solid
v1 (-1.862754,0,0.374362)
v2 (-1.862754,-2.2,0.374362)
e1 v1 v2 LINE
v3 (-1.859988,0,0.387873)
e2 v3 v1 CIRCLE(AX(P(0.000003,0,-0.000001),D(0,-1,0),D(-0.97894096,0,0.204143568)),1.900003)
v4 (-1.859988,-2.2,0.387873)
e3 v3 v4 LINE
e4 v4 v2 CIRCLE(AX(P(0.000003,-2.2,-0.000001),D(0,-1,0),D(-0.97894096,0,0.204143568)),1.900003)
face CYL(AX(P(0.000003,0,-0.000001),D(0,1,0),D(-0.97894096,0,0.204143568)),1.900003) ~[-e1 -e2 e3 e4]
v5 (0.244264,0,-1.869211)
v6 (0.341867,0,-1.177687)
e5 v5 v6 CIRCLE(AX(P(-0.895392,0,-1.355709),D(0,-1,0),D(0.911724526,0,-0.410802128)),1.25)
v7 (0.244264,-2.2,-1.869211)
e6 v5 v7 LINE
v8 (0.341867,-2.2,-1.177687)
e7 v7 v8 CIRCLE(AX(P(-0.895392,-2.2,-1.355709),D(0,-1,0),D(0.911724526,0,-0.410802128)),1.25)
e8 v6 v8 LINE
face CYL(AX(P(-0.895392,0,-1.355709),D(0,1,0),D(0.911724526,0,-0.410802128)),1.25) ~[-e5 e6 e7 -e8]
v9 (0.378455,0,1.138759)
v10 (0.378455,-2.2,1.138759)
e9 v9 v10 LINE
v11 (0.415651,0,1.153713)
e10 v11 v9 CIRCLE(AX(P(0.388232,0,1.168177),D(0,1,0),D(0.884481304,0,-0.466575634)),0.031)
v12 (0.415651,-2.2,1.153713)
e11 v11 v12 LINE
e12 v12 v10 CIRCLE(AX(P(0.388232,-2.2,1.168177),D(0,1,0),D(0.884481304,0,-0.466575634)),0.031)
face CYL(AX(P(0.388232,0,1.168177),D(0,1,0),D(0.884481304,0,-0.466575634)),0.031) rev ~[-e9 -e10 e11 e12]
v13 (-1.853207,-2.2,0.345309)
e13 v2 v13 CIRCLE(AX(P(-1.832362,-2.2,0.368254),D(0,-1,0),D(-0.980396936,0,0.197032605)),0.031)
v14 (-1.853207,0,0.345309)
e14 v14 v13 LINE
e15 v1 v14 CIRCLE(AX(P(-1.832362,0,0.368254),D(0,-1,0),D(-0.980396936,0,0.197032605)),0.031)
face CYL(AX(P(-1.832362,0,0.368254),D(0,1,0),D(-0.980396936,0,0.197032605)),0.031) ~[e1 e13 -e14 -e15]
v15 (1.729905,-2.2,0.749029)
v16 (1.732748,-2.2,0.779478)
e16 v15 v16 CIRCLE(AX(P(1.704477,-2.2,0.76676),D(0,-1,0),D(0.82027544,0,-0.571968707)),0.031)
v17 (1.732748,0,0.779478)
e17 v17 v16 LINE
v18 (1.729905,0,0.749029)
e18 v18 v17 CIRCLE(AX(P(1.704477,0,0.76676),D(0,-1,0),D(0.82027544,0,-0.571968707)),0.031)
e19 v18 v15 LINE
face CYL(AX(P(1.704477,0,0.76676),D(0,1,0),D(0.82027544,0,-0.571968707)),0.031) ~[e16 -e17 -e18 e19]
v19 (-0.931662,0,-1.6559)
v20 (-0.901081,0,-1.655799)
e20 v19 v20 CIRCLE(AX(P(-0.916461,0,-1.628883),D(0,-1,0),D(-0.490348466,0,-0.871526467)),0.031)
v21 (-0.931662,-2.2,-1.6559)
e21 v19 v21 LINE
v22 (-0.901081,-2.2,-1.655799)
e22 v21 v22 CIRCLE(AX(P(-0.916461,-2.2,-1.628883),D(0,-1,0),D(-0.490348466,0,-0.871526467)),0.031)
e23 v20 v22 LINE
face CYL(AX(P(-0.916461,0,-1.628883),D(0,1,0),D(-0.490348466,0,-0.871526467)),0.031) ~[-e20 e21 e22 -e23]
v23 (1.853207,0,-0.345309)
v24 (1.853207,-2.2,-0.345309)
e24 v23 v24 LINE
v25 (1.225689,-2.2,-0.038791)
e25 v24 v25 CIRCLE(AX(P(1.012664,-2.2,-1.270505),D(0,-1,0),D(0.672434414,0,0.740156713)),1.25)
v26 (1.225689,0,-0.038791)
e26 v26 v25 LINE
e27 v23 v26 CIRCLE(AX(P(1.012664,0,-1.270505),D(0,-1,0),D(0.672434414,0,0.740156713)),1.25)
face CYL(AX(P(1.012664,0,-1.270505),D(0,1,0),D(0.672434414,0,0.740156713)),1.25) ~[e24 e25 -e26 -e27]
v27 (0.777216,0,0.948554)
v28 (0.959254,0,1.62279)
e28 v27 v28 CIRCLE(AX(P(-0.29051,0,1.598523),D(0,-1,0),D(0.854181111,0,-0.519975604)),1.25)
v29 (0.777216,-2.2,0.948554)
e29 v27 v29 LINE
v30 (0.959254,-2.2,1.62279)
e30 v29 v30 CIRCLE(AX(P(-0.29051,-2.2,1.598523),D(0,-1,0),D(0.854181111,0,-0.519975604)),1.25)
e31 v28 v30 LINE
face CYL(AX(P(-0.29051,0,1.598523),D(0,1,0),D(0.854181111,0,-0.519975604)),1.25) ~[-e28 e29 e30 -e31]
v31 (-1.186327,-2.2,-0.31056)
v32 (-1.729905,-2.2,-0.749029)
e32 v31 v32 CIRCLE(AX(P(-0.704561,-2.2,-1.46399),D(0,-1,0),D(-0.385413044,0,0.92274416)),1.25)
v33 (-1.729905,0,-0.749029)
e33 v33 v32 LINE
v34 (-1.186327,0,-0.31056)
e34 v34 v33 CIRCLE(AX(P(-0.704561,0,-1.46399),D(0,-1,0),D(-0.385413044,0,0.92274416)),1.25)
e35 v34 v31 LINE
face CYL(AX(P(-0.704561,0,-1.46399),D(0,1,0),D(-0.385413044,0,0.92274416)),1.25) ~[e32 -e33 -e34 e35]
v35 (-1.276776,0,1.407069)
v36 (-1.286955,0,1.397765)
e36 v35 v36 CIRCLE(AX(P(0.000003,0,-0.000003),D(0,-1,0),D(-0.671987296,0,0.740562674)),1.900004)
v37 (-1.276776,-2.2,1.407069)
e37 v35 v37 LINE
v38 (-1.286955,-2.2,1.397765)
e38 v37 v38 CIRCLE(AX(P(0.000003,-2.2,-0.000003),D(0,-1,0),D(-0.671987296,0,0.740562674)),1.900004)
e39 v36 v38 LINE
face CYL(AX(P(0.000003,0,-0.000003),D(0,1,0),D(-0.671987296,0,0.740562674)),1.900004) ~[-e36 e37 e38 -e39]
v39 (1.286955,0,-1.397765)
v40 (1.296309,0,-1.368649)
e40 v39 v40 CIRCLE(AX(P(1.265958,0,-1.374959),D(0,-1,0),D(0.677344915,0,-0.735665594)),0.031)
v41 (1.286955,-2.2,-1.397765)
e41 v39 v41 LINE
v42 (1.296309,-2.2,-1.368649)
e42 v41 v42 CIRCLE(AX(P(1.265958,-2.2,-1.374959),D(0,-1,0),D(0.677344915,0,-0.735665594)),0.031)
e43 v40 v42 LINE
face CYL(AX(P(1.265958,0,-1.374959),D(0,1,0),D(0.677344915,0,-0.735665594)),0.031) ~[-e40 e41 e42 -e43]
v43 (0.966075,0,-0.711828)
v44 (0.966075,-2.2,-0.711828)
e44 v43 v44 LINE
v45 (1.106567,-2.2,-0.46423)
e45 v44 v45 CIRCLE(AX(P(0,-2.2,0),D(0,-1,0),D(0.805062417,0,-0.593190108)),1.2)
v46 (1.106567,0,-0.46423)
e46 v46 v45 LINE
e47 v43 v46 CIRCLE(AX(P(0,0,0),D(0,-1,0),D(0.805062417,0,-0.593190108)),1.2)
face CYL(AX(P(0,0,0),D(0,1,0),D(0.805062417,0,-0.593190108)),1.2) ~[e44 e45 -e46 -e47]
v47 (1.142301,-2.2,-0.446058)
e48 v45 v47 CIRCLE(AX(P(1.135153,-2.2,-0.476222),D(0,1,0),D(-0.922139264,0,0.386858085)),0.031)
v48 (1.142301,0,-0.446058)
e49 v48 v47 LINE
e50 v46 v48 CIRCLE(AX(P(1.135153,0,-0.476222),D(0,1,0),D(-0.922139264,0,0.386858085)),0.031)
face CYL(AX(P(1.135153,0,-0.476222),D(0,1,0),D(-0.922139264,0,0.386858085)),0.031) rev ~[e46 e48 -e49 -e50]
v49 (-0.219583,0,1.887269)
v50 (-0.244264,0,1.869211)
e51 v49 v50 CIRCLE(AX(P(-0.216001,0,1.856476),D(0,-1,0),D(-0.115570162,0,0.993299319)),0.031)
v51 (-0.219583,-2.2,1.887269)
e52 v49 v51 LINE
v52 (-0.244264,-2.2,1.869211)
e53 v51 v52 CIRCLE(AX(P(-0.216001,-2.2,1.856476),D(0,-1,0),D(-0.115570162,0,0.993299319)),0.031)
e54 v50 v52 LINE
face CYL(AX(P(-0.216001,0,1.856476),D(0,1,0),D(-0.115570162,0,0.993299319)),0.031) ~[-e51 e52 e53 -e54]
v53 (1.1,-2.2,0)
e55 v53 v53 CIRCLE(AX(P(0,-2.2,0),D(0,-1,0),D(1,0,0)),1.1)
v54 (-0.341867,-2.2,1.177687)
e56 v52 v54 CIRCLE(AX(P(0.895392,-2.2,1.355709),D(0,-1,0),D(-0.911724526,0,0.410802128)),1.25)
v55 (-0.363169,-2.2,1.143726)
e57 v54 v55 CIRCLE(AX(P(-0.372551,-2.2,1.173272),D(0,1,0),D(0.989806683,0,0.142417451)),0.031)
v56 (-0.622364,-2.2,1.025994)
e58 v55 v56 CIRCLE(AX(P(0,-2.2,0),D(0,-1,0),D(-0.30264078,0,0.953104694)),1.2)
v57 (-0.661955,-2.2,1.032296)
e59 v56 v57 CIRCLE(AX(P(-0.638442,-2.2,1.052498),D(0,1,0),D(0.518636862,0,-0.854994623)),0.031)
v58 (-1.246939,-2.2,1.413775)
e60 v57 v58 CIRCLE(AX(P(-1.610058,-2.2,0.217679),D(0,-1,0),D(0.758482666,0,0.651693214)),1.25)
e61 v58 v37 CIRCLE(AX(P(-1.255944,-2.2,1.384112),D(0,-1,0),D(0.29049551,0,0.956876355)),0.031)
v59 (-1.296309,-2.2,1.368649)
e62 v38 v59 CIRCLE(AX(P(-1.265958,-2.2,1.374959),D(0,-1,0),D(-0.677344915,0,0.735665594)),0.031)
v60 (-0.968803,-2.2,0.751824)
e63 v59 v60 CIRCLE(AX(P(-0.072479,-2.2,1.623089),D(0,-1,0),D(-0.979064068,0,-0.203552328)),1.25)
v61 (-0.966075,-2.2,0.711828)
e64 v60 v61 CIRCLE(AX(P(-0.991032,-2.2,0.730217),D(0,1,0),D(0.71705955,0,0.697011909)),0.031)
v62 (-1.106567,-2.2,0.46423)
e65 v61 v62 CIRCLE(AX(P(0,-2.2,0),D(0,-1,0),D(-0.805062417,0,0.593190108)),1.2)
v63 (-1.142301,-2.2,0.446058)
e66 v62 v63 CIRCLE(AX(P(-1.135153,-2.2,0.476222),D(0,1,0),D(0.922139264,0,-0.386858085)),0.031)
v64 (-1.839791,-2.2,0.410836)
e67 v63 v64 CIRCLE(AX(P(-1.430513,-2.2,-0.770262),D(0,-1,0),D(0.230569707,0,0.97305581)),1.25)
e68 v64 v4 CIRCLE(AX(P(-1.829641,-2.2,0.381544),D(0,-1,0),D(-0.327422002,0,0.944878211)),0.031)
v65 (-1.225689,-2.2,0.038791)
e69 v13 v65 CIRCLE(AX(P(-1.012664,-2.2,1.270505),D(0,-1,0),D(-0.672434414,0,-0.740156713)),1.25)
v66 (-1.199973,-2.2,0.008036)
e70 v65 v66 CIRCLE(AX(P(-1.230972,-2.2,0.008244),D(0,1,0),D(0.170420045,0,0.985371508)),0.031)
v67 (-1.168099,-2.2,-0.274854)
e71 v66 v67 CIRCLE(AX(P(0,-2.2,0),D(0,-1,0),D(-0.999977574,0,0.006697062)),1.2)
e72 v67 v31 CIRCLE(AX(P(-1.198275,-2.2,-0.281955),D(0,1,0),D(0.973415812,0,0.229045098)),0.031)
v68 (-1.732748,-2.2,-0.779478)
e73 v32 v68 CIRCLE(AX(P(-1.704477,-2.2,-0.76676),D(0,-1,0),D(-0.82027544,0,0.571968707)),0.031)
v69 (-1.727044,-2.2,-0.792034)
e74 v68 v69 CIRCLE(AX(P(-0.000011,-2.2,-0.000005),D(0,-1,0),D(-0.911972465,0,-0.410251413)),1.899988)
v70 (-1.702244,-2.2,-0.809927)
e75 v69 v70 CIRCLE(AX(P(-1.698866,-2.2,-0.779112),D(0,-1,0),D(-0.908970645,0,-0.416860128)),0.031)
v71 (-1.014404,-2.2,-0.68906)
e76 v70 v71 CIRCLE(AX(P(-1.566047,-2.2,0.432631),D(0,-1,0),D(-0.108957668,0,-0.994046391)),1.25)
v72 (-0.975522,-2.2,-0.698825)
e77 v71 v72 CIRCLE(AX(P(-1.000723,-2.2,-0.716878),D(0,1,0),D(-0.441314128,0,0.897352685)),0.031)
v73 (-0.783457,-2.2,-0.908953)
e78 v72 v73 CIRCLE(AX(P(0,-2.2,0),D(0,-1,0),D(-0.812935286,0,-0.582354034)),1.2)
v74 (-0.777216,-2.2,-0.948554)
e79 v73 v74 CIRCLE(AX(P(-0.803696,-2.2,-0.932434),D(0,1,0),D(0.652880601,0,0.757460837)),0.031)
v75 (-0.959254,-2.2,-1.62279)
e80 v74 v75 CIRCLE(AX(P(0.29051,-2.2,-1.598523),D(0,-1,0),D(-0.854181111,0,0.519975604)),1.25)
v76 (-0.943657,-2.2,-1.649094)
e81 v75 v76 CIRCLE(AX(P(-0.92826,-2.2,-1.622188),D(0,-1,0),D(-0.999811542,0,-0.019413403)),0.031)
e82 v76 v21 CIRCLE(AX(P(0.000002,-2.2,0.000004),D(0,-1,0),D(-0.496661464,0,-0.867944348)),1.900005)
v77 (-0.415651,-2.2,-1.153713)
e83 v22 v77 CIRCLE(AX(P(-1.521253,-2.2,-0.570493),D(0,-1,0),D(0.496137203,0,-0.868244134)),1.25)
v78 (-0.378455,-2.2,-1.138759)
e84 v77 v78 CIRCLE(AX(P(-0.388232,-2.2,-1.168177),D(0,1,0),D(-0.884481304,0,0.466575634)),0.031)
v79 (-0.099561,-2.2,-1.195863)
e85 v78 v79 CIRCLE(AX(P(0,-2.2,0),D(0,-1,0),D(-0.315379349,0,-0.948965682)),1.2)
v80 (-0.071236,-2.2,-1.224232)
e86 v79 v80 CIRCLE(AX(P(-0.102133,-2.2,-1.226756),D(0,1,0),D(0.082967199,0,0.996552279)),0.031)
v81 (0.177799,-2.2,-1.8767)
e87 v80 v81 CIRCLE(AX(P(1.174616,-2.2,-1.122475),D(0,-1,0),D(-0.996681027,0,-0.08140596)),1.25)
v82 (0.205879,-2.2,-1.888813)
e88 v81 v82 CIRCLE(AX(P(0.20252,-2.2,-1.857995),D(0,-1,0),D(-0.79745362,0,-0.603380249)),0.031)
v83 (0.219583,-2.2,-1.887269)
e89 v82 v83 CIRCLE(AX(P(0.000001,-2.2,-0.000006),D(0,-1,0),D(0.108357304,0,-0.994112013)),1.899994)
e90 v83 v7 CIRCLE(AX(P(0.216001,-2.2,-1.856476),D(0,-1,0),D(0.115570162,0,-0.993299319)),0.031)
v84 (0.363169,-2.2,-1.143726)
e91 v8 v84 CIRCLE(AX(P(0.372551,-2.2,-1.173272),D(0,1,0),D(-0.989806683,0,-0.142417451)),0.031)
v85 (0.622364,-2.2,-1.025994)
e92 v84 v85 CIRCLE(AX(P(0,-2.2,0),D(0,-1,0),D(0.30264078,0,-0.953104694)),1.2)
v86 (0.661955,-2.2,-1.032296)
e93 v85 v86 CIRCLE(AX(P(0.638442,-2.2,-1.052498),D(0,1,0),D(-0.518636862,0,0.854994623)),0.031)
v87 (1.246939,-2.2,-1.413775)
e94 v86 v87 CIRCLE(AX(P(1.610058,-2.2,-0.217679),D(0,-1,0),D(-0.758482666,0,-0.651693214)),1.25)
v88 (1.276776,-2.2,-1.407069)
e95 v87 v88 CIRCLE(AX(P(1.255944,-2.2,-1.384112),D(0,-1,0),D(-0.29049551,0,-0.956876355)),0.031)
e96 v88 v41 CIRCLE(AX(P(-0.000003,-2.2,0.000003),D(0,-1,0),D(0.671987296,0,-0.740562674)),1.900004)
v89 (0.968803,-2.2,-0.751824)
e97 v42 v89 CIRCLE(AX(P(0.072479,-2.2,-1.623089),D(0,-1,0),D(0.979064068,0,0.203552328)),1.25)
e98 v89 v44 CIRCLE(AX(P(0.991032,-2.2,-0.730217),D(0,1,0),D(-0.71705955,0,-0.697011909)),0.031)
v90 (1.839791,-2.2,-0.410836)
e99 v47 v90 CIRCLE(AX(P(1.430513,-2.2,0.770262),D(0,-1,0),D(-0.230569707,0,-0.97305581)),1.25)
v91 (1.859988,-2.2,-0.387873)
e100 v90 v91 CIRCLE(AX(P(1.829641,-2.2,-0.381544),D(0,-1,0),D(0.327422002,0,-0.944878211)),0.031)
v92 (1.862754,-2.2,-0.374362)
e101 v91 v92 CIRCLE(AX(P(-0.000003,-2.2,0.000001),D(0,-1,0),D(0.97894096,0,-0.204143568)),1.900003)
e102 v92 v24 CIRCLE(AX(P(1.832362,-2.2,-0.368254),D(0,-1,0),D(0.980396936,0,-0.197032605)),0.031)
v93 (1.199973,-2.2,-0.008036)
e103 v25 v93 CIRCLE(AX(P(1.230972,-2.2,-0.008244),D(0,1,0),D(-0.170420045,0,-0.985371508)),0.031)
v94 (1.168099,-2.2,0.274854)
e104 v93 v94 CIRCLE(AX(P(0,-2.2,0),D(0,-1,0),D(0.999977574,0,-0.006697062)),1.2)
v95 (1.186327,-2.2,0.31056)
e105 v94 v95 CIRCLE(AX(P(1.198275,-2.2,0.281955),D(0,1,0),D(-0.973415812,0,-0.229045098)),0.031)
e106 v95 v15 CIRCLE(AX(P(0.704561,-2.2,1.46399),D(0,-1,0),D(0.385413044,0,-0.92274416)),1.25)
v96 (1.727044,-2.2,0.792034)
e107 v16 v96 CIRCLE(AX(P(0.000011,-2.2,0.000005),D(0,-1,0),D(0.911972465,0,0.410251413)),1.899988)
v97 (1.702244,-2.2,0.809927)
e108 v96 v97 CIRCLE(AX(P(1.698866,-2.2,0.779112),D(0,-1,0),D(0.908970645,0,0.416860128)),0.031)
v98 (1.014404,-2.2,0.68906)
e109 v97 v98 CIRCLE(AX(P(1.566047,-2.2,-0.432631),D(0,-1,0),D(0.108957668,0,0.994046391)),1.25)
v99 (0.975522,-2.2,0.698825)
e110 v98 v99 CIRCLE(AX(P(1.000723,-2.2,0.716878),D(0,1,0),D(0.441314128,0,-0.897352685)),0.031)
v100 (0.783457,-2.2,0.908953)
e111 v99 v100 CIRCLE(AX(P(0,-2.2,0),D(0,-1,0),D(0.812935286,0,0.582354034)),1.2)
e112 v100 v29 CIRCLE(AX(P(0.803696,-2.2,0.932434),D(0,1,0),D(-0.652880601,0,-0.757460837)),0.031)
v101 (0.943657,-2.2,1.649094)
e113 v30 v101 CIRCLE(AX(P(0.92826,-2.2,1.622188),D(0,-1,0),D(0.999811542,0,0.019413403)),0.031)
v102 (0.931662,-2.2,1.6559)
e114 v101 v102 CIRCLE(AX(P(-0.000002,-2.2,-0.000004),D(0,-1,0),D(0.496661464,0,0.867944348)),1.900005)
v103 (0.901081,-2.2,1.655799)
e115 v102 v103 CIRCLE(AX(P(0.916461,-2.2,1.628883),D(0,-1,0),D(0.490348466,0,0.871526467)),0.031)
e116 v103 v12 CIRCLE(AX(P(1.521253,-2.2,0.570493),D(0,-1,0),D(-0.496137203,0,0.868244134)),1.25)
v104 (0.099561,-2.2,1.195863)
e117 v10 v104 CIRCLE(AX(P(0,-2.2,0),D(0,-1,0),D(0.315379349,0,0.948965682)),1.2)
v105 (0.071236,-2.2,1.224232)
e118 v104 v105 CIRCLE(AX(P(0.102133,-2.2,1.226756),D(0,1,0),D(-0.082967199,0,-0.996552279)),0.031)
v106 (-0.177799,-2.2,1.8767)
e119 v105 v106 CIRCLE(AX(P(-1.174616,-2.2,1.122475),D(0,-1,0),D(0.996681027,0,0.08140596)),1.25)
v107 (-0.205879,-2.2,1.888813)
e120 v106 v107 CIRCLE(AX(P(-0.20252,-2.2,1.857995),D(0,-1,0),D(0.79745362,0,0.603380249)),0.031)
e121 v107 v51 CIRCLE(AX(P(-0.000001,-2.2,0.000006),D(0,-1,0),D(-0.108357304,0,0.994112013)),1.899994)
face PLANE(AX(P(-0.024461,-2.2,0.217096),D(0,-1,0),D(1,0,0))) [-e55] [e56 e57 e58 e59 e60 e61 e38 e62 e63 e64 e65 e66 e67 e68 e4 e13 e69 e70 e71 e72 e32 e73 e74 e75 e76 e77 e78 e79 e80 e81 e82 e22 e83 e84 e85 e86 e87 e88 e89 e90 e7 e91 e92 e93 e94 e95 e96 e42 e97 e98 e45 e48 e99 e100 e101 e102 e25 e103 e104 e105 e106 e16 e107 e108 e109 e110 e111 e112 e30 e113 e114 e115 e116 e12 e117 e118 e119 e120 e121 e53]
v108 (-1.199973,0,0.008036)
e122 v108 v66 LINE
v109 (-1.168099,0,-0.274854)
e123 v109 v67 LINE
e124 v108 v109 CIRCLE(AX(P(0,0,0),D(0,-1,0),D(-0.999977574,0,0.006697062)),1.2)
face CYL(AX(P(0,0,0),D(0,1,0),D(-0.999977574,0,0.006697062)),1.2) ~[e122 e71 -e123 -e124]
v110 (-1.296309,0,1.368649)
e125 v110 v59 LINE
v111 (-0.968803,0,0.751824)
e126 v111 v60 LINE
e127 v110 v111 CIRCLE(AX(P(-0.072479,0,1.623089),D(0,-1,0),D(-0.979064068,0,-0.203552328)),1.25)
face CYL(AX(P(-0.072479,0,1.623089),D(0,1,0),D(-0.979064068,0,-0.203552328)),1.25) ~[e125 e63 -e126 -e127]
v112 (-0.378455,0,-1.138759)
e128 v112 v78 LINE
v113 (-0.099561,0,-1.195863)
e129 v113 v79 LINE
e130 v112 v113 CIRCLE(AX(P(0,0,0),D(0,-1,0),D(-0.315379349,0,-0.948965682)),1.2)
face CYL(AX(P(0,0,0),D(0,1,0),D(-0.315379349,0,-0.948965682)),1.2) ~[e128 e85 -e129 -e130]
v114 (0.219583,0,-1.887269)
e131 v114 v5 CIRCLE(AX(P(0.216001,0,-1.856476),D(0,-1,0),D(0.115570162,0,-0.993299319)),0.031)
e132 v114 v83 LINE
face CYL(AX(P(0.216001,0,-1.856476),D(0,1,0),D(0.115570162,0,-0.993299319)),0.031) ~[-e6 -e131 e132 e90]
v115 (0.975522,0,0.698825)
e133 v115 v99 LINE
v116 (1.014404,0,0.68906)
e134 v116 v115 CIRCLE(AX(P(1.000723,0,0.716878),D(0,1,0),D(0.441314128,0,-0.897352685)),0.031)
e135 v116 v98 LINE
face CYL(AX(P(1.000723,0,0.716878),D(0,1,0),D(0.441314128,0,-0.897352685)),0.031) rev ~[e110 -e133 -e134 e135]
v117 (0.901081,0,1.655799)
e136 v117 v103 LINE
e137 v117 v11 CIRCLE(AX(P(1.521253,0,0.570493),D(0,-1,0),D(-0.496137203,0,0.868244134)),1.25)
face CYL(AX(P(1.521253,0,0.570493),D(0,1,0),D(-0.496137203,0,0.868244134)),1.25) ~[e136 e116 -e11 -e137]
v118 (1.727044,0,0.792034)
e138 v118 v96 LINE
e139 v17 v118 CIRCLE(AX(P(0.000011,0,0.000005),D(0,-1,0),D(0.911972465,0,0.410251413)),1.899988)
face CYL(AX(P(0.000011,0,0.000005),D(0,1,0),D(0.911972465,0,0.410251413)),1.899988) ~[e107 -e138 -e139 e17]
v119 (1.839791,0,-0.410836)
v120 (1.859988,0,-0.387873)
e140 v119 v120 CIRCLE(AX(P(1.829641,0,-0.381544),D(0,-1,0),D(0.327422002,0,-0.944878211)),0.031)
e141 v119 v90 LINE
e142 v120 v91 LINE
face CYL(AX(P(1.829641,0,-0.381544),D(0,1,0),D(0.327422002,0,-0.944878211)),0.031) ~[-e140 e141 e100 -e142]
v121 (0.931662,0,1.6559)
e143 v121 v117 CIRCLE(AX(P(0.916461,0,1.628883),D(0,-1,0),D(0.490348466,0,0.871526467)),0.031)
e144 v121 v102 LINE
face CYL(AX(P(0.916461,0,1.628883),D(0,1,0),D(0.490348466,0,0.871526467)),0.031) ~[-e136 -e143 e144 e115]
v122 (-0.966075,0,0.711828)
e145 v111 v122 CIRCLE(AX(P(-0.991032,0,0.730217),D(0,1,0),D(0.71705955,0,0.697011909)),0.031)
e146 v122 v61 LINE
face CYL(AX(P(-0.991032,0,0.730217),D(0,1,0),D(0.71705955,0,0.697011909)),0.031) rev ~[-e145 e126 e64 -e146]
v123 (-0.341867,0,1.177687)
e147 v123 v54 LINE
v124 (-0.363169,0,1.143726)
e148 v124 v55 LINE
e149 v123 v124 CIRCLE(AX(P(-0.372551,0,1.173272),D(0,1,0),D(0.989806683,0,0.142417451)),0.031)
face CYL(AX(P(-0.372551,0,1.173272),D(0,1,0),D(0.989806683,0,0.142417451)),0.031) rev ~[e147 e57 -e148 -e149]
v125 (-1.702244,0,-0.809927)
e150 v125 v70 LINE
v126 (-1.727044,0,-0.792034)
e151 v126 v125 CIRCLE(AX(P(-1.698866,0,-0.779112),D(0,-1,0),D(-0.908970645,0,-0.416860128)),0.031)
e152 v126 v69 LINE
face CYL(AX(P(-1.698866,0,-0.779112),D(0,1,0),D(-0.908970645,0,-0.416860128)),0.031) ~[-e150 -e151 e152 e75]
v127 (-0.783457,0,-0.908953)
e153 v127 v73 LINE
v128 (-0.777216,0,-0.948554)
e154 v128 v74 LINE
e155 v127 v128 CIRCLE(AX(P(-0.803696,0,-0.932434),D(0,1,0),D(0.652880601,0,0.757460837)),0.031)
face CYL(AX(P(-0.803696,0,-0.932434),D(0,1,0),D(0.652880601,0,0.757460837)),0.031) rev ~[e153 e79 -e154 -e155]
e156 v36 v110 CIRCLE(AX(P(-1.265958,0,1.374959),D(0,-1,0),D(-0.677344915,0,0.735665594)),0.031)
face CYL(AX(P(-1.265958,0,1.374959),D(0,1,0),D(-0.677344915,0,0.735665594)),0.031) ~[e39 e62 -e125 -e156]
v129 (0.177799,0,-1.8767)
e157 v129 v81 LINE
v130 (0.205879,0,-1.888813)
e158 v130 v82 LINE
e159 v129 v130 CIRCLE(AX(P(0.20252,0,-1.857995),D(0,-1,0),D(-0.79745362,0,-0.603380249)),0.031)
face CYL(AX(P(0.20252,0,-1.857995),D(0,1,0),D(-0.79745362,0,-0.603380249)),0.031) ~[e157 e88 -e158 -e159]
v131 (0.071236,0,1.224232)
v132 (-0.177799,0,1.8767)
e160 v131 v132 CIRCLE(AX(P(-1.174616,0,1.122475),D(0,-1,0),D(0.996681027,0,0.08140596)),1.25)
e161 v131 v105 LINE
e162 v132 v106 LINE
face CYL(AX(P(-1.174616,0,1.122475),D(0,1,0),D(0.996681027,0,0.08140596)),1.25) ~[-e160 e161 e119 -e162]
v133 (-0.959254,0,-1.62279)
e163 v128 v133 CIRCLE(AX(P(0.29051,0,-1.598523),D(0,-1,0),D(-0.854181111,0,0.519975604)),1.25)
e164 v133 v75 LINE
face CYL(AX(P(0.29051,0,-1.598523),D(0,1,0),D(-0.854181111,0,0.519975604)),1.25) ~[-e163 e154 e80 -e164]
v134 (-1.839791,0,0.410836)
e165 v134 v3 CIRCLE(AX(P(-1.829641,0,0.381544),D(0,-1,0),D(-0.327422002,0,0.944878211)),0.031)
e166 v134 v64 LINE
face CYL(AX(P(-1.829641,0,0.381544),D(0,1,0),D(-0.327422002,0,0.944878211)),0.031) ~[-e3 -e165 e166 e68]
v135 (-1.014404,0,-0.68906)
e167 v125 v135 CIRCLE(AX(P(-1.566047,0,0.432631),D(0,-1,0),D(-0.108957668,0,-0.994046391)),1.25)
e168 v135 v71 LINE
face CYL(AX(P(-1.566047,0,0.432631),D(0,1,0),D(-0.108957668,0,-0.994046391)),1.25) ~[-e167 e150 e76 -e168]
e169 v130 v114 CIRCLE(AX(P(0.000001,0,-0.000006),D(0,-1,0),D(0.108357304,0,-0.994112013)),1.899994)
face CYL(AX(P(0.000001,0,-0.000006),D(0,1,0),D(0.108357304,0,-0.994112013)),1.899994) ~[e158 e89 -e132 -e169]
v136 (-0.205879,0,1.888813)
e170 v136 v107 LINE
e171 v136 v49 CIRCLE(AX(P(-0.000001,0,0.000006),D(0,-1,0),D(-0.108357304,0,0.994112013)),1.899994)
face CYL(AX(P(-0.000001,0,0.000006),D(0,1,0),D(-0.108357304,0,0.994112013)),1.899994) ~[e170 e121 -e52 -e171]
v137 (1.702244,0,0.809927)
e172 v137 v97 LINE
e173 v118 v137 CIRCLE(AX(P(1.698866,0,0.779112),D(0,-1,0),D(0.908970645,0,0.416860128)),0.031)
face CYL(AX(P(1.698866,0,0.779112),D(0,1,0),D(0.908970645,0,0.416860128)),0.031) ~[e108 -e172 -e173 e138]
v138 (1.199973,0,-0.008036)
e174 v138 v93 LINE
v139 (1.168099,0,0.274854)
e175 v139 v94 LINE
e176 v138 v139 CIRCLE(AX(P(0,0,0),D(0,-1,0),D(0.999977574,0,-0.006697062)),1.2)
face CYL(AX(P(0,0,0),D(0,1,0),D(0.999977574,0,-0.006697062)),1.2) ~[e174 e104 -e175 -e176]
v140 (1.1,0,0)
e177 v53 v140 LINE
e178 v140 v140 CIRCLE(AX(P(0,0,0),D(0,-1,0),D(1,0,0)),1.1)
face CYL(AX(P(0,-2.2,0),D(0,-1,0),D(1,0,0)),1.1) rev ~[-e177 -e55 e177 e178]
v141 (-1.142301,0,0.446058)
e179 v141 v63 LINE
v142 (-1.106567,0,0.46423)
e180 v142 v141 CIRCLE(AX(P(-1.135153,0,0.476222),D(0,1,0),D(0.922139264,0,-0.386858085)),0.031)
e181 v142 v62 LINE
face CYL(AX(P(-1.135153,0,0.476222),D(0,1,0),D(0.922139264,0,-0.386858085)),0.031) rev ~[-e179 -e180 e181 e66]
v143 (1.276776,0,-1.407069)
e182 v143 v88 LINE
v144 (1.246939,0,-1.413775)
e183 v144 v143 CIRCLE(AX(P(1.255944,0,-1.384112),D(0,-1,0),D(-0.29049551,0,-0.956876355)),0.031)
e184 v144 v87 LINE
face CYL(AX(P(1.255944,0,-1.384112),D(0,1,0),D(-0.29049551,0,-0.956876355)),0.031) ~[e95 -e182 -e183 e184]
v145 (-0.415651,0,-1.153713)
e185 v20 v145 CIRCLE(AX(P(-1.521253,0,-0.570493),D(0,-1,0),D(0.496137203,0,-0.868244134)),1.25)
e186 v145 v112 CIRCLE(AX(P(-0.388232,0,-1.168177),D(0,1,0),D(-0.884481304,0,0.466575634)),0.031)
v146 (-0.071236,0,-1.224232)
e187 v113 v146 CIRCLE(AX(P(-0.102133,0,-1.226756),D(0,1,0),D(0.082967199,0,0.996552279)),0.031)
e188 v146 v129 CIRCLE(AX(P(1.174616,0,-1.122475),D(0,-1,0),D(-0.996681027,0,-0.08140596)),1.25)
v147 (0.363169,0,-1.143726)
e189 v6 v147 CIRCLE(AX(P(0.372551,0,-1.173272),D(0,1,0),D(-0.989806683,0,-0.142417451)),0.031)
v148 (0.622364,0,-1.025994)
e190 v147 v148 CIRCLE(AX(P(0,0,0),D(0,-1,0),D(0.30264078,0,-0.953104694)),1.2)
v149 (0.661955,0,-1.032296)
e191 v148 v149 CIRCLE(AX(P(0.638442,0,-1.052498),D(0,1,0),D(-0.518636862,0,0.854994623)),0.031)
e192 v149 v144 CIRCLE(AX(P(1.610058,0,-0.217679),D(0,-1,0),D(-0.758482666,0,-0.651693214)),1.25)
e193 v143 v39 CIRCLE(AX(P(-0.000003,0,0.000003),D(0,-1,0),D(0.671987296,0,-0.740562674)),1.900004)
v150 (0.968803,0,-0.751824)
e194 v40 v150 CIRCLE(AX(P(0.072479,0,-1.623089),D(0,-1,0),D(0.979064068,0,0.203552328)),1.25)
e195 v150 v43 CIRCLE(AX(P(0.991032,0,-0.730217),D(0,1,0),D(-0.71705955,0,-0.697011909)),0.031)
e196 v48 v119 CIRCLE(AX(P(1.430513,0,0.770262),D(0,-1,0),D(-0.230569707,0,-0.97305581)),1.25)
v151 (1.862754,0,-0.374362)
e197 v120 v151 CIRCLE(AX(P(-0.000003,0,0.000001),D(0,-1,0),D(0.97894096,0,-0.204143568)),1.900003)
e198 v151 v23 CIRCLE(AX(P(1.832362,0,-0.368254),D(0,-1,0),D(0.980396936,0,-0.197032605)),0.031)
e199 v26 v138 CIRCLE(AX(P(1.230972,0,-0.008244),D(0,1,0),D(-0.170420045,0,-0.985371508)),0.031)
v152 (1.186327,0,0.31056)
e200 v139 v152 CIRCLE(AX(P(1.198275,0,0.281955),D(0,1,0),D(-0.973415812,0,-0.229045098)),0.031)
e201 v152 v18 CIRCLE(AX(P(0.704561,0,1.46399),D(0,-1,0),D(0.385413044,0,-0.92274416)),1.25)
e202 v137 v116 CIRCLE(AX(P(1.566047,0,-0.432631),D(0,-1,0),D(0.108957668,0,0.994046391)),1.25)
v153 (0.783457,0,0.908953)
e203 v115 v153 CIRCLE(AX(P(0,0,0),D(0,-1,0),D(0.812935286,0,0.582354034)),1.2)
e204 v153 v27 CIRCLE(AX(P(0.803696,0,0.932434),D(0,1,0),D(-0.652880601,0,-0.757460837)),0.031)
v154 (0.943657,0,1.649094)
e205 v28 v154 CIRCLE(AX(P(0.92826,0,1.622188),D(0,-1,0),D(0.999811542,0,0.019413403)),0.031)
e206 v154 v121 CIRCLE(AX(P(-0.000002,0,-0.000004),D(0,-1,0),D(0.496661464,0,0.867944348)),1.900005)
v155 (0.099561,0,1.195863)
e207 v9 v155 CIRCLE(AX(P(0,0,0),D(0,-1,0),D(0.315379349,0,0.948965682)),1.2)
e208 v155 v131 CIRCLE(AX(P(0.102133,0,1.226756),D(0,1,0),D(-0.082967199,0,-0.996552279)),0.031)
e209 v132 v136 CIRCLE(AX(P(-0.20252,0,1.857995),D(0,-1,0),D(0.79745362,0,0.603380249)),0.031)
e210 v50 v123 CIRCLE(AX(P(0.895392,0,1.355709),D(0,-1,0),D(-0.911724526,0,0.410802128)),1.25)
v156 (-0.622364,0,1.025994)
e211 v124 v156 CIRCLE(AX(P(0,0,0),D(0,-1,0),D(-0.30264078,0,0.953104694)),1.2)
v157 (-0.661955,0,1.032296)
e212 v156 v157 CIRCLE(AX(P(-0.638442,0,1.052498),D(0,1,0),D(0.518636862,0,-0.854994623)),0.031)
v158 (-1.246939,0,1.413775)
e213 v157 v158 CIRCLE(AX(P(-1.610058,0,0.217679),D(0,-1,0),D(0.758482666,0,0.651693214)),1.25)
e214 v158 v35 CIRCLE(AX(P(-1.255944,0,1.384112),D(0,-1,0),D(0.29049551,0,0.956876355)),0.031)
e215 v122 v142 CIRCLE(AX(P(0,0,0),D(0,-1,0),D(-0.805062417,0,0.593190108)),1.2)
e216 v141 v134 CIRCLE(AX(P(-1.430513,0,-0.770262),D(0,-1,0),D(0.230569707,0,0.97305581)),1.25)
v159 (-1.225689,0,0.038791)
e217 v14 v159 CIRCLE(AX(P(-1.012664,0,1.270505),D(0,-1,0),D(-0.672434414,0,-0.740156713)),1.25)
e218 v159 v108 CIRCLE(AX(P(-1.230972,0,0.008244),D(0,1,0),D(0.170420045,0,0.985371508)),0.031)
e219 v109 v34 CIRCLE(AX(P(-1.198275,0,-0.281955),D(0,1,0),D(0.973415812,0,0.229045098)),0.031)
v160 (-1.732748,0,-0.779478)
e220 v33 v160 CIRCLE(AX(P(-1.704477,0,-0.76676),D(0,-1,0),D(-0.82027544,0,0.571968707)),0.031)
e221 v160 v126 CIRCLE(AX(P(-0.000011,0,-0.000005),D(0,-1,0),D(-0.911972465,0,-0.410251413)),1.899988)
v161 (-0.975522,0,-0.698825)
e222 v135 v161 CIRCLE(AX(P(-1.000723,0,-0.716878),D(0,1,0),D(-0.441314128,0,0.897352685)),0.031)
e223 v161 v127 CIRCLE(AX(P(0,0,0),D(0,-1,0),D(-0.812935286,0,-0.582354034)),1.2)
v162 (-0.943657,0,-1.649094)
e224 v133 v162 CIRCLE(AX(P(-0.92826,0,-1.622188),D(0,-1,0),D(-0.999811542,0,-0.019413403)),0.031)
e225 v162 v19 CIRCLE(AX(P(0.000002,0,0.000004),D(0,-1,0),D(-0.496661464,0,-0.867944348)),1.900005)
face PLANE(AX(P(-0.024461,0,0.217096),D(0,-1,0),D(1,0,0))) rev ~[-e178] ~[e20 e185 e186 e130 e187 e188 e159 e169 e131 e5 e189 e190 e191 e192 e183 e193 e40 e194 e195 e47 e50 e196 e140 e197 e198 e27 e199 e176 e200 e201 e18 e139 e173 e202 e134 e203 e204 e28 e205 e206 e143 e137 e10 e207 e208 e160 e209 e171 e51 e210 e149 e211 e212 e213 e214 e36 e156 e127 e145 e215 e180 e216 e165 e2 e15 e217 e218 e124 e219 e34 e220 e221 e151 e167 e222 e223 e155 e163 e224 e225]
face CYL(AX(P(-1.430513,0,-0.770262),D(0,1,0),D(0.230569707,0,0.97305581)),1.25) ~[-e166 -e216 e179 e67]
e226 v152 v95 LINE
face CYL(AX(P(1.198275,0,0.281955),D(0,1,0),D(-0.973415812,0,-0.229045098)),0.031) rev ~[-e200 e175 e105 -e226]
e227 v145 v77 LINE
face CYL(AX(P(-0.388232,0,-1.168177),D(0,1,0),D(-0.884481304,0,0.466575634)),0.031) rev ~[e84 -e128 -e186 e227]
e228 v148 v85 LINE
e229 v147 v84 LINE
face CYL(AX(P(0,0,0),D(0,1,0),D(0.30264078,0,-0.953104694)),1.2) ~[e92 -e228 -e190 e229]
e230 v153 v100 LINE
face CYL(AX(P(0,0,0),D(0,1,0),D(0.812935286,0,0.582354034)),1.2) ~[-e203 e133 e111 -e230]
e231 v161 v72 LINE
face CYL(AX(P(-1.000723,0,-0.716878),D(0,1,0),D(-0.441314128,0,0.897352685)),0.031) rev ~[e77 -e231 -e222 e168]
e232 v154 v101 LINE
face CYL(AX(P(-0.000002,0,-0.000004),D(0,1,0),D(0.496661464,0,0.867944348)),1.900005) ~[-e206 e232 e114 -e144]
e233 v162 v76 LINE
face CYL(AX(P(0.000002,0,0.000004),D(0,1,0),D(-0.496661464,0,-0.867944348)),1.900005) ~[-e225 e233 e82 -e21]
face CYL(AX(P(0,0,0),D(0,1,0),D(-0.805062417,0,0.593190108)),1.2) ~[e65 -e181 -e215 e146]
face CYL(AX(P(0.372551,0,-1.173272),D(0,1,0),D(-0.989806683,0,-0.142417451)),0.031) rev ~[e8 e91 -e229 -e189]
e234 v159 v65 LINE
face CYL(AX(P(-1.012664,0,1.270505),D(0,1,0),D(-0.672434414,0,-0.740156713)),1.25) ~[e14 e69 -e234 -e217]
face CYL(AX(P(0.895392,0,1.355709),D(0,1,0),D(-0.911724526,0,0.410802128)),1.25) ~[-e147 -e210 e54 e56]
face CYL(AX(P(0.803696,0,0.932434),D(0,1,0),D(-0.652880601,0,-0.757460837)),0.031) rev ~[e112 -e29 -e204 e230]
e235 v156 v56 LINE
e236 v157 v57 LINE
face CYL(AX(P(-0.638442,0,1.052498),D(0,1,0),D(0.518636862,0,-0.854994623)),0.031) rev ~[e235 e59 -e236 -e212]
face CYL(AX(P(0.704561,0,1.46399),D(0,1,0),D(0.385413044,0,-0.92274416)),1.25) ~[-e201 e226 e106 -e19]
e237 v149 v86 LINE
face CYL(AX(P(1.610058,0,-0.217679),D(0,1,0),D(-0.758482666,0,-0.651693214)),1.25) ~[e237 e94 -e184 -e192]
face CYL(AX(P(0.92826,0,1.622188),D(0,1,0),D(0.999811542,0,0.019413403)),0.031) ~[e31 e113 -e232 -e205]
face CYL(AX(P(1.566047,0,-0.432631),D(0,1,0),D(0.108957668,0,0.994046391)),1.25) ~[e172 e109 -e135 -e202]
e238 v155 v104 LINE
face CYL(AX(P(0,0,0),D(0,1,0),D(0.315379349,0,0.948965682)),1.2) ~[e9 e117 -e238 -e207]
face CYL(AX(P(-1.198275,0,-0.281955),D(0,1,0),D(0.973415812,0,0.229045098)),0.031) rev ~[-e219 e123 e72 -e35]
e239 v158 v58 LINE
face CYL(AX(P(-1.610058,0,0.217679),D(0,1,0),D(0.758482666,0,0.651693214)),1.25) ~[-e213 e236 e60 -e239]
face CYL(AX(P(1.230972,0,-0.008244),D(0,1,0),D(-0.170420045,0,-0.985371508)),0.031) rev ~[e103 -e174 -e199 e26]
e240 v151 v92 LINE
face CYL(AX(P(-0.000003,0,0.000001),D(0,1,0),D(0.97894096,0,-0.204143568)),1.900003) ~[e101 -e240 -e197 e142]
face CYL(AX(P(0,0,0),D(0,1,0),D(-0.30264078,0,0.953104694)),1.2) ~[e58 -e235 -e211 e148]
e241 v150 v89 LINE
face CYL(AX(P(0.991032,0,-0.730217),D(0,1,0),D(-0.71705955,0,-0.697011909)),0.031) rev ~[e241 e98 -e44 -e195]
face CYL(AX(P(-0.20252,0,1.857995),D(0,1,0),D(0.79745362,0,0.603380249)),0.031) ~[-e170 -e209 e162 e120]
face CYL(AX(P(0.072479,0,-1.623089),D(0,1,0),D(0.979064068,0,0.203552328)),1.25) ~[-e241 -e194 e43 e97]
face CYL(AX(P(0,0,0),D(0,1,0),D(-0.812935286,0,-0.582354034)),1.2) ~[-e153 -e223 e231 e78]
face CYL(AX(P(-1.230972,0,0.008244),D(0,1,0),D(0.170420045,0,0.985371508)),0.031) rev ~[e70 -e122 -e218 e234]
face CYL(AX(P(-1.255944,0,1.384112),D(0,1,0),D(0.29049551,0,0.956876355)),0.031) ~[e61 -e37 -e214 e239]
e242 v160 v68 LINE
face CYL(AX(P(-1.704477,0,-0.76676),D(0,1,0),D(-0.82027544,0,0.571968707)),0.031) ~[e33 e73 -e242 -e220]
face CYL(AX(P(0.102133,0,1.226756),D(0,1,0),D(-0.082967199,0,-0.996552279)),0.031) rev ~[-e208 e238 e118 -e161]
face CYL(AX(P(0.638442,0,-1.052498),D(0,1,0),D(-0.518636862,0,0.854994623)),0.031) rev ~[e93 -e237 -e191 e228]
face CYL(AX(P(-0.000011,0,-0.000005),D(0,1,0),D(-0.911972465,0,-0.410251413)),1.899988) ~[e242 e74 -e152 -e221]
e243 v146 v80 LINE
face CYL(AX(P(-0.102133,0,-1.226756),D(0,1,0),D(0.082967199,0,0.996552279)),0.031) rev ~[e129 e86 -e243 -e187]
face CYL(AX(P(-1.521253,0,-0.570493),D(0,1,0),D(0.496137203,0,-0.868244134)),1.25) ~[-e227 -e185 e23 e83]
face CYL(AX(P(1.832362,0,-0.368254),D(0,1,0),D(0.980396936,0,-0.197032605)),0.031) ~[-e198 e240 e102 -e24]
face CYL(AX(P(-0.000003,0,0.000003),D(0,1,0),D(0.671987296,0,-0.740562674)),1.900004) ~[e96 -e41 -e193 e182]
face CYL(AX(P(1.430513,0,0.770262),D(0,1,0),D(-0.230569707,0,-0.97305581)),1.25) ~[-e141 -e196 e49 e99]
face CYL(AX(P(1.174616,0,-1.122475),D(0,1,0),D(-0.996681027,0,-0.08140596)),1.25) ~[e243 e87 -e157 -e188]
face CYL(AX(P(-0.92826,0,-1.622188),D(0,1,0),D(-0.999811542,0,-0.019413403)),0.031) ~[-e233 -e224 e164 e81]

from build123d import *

# Parameters (mm, degrees)
F1_DEPTH = 2.2
F2_R     = 1.1
F3_DEPTH = 2.201


# Not quite as in the source:
# - a feature names something its author has since deleted; it is built from what else it names


with BuildPart() as f1:
    # F0 (on Front) → F1 (new body)
    with BuildSketch(Plane.XZ):
        with BuildLine():
            ThreePointArc((0.0712355079, 1.2242322703), (-0.0067892224, 1.5682114478), (-0.1777987566, 1.8767001385))
            ThreePointArc((-0.1777987566, 1.8767001385), (-0.1902412648, 1.886460015), (-0.2058788954, 1.888812823))
            ThreePointArc((-0.2058788954, 1.888812823), (-0.2127325046, 1.8880531988), (-0.2195833118, 1.8872687061))
            ThreePointArc((-0.2195833118, 1.8872687061), (-0.2343053253, 1.8814951877), (-0.244264097, 1.8692112932))
            ThreePointArc((-0.244264097, 1.8692112932), (-0.3423408736, 1.5304038568), (-0.3418667931, 1.1776868196))
            ThreePointArc((-0.3418667931, 1.1776868196), (-0.3462894397, 1.1567994489), (-0.3631689361, 1.1437256331))
            ThreePointArc((-0.3631689361, 1.1437256331), (-0.496270206, 1.092573056), (-0.6223642321, 1.025993549))
            ThreePointArc((-0.6223642321, 1.025993549), (-0.8096046551, 0.885742797), (-0.966074901, 0.7118281293))
            ThreePointArc((-0.966074901, 0.7118281293), (-1.0436893598, 0.5922098617), (-1.1065671175, 0.4642297001))
            ThreePointArc((-1.1065671175, 0.4642297001), (-1.1756104781, 0.2407072989), (-1.1999730893, 0.0080364743))
            ThreePointArc((-1.1999730893, 0.0080364743), (-1.1924546519, -0.1343573713), (-1.1680989749, -0.2748541157))
            ThreePointArc((-1.1680989749, -0.2748541157), (-1.092573056, -0.496270206), (-0.9755223431, -0.6988248408))
            ThreePointArc((-0.9755223431, -0.6988248408), (-0.885742797, -0.8096046551), (-0.7834567261, -0.9089530012))
            ThreePointArc((-0.7834567261, -0.9089530012), (-0.5922098617, -1.0436893598), (-0.3784552187, -1.1387588188))
            ThreePointArc((-0.3784552187, -1.1387588188), (-0.2407072989, -1.1756104781), (-0.0995606366, -1.1958627344))
            ThreePointArc((-0.0995606366, -1.1958627344), (0.1343573713, -1.1924546519), (0.3631689361, -1.1437256331))
            ThreePointArc((0.3631689361, -1.1437256331), (0.496270206, -1.092573056), (0.6223642321, -1.025993549))
            ThreePointArc((0.6223642321, -1.025993549), (0.8096046551, -0.885742797), (0.966074901, -0.7118281293))
            ThreePointArc((0.966074901, -0.7118281293), (1.0436893598, -0.5922098617), (1.1065671175, -0.4642297001))
            ThreePointArc((1.1065671175, -0.4642297001), (1.1756104781, -0.2407072989), (1.1999730893, -0.0080364743))
            ThreePointArc((1.1999730893, -0.0080364743), (1.1924546519, 0.1343573713), (1.1680989749, 0.2748541157))
            ThreePointArc((1.1680989749, 0.2748541157), (1.092573056, 0.496270206), (0.9755223431, 0.6988248408))
            ThreePointArc((0.9755223431, 0.6988248408), (0.885742797, 0.8096046551), (0.7834567261, 0.9089530012))
            ThreePointArc((0.7834567261, 0.9089530012), (0.5922098617, 1.0436893598), (0.3784552187, 1.1387588188))
            ThreePointArc((0.3784552187, 1.1387588188), (0.2407072989, 1.1756104781), (0.0995606366, 1.1958627344))
            ThreePointArc((0.0995606366, 1.1958627344), (0.0801951467, 1.2048527211), (0.0712355079, 1.2242322703))
        make_face()
        with BuildLine():
            ThreePointArc((-0.966074901, 0.7118281293), (-0.8096046551, 0.885742797), (-0.6223642321, 1.025993549))
            ThreePointArc((-0.6223642321, 1.025993549), (-0.6433154241, 1.0218838516), (-0.6619549374, 1.0322958927))
            ThreePointArc((-0.6619549374, 1.0322958927), (-0.9272641578, 1.2647191073), (-1.2469388801, 1.4137748184))
            ThreePointArc((-1.2469388801, 1.4137748184), (-1.262741792, 1.4143572015), (-1.2767758469, 1.4070690946))
            ThreePointArc((-1.2767758469, 1.4070690946), (-1.2818740373, 1.4024260952), (-1.2869553435, 1.3977646239))
            ThreePointArc((-1.2869553435, 1.3977646239), (-1.2954721137, 1.3844403669), (-1.2963086372, 1.3686488684))
            ThreePointArc((-1.2963086372, 1.3686488684), (-1.1765084017, 1.0368998116), (-0.9688029898, 0.7518243919))
            ThreePointArc((-0.9688029898, 0.7518243919), (-0.9601036976, 0.7323265875), (-0.966074901, 0.7118281293))
        make_face()
        with BuildLine():
            ThreePointArc((-0.9755223431, -0.6988248408), (-1.092573056, -0.496270206), (-1.1680989749, -0.2748541157))
            ThreePointArc((-1.1680989749, -0.2748541157), (-1.1706646948, -0.2960498497), (-1.1863270607, -0.3105595826))
            ThreePointArc((-1.1863270607, -0.3105595826), (-1.4893597313, -0.4910609223), (-1.7299050585, -0.7490289022))
            ThreePointArc((-1.7299050585, -0.7490289022), (-1.7353423061, -0.7638783983), (-1.7327476659, -0.7794777265))
            ThreePointArc((-1.7327476659, -0.7794777265), (-1.7299073387, -0.7857611594), (-1.7270442259, -0.7920342427))
            ThreePointArc((-1.7270442259, -0.7920342427), (-1.7170039312, -0.8042515943), (-1.7022438237, -0.8099270169))
            ThreePointArc((-1.7022438237, -0.8099270169), (-1.3497114128, -0.7985063187), (-1.0144040751, -0.6890598826))
            ThreePointArc((-1.0144040751, -0.6890598826), (-0.9931723321, -0.686811517), (-0.9755223431, -0.6988248408))
        make_face()
        with BuildLine():
            ThreePointArc((0.3418667931, -1.1776868196), (0.3462894397, -1.1567994489), (0.3631689361, -1.1437256331))
            ThreePointArc((0.3631689361, -1.1437256331), (0.1343573713, -1.1924546519), (-0.0995606366, -1.1958627344))
            ThreePointArc((-0.0995606366, -1.1958627344), (-0.0801951467, -1.2048527211), (-0.0712355079, -1.2242322703))
            ThreePointArc((-0.0712355079, -1.2242322703), (0.0067892224, -1.5682114478), (0.1777987566, -1.8767001385))
            ThreePointArc((0.1777987566, -1.8767001385), (0.1902412648, -1.886460015), (0.2058788954, -1.888812823))
            ThreePointArc((0.2058788954, -1.888812823), (0.2127325046, -1.8880531988), (0.2195833118, -1.8872687061))
            ThreePointArc((0.2195833118, -1.8872687061), (0.2343053253, -1.8814951877), (0.244264097, -1.8692112932))
            ThreePointArc((0.244264097, -1.8692112932), (0.3423408736, -1.5304038568), (0.3418667931, -1.1776868196))
        make_face()
        with BuildLine():
            ThreePointArc((0.9688029898, -0.7518243919), (0.9601036976, -0.7323265875), (0.966074901, -0.7118281293))
            ThreePointArc((0.966074901, -0.7118281293), (0.8096046551, -0.885742797), (0.6223642321, -1.025993549))
            ThreePointArc((0.6223642321, -1.025993549), (0.6433154241, -1.0218838516), (0.6619549374, -1.0322958927))
            ThreePointArc((0.6619549374, -1.0322958927), (0.9272641578, -1.2647191073), (1.2469388801, -1.4137748184))
            ThreePointArc((1.2469388801, -1.4137748184), (1.262741792, -1.4143572015), (1.2767758469, -1.4070690946))
            ThreePointArc((1.2767758469, -1.4070690946), (1.2818740373, -1.4024260952), (1.2869553435, -1.3977646239))
            ThreePointArc((1.2869553435, -1.3977646239), (1.2954721137, -1.3844403669), (1.2963086372, -1.3686488684))
            ThreePointArc((1.2963086372, -1.3686488684), (1.1765084017, -1.0368998116), (0.9688029898, -0.7518243919))
        make_face()
        with BuildLine():
            ThreePointArc((1.2256893728, -0.0387906), (1.2071909758, -0.0281298606), (1.1999730893, -0.0080364743))
            ThreePointArc((1.1999730893, -0.0080364743), (1.1756104781, -0.2407072989), (1.1065671175, -0.4642297001))
            ThreePointArc((1.1065671175, -0.4642297001), (1.1211013684, -0.4485900834), (1.1423010956, -0.4460575705))
            ThreePointArc((1.1423010956, -0.4460575705), (1.4935557015, -0.478147054), (1.8397907332, -0.4108355701))
            ThreePointArc((1.8397907332, -0.4108355701), (1.8529178738, -0.4020180093), (1.8599878209, -0.3878727965))
            ThreePointArc((1.8599878209, -0.3878727965), (1.861383257, -0.38111989), (1.862754176, -0.3743619636))
            ThreePointArc((1.862754176, -0.3743619636), (1.861812586, -0.3585763814), (1.8532073379, -0.3453090945))
            ThreePointArc((1.8532073379, -0.3453090945), (1.5612897084, -0.1473352813), (1.2256893728, -0.0387906))
        make_face()
        with BuildLine():
            ThreePointArc((1.0144040751, 0.6890598826), (0.9931723321, 0.686811517), (0.9755223431, 0.6988248408))
            ThreePointArc((0.9755223431, 0.6988248408), (1.092573056, 0.496270206), (1.1680989749, 0.2748541157))
            ThreePointArc((1.1680989749, 0.2748541157), (1.1706646948, 0.2960498497), (1.1863270607, 0.3105595826))
            ThreePointArc((1.1863270607, 0.3105595826), (1.4893597313, 0.4910609223), (1.7299050585, 0.7490289022))
            ThreePointArc((1.7299050585, 0.7490289022), (1.7353423061, 0.7638783983), (1.7327476659, 0.7794777265))
            ThreePointArc((1.7327476659, 0.7794777265), (1.7299073387, 0.7857611594), (1.7270442259, 0.7920342427))
            ThreePointArc((1.7270442259, 0.7920342427), (1.7170039312, 0.8042515943), (1.7022438237, 0.8099270169))
            ThreePointArc((1.7022438237, 0.8099270169), (1.3497114128, 0.7985063187), (1.0144040751, 0.6890598826))
        make_face()
        with BuildLine():
            ThreePointArc((0.4156508989, 1.1537129104), (0.3997956142, 1.139414239), (0.3784552187, 1.1387588188))
            ThreePointArc((0.3784552187, 1.1387588188), (0.5922098617, 1.0436893598), (0.7834567261, 0.9089530012))
            ThreePointArc((0.7834567261, 0.9089530012), (0.7730738972, 0.9276088025), (0.7772164104, 0.9485535308))
            ThreePointArc((0.7772164104, 0.9485535308), (0.9162789653, 1.2727003169), (0.9592544487, 1.6227897924))
            ThreePointArc((0.9592544487, 1.6227897924), (0.9549249596, 1.6379992211), (0.9436567966, 1.6490942515))
            ThreePointArc((0.9436567966, 1.6490942515), (0.9376656143, 1.652508153), (0.9316620816, 1.6559002886))
            ThreePointArc((0.9316620816, 1.6559002886), (0.9163581335, 1.6598827965), (0.901081026, 1.6557985362))
            ThreePointArc((0.901081026, 1.6557985362), (0.6225892324, 1.4393456452), (0.4156508989, 1.1537129104))
        make_face()
        with BuildLine():
            ThreePointArc((-1.1999730893, 0.0080364743), (-1.1756104781, 0.2407072989), (-1.1065671175, 0.4642297001))
            ThreePointArc((-1.1065671175, 0.4642297001), (-1.1211013684, 0.4485900834), (-1.1423010956, 0.4460575705))
            ThreePointArc((-1.1423010956, 0.4460575705), (-1.4935557015, 0.478147054), (-1.8397907332, 0.4108355701))
            ThreePointArc((-1.8397907332, 0.4108355701), (-1.8529178738, 0.4020180093), (-1.8599878209, 0.3878727965))
            ThreePointArc((-1.8599878209, 0.3878727965), (-1.861383257, 0.38111989), (-1.862754176, 0.3743619636))
            ThreePointArc((-1.862754176, 0.3743619636), (-1.861812586, 0.3585763814), (-1.8532073379, 0.3453090945))
            ThreePointArc((-1.8532073379, 0.3453090945), (-1.5612897084, 0.1473352813), (-1.2256893728, 0.0387906))
            ThreePointArc((-1.2256893728, 0.0387906), (-1.2071909758, 0.0281298606), (-1.1999730893, 0.0080364743))
        make_face()
        with BuildLine():
            ThreePointArc((-0.3784552187, -1.1387588188), (-0.5922098617, -1.0436893598), (-0.7834567261, -0.9089530012))
            ThreePointArc((-0.7834567261, -0.9089530012), (-0.7730738972, -0.9276088025), (-0.7772164104, -0.9485535308))
            ThreePointArc((-0.7772164104, -0.9485535308), (-0.9162789653, -1.2727003169), (-0.9592544487, -1.6227897924))
            ThreePointArc((-0.9592544487, -1.6227897924), (-0.9549249596, -1.6379992211), (-0.9436567966, -1.6490942515))
            ThreePointArc((-0.9436567966, -1.6490942515), (-0.9376656143, -1.652508153), (-0.9316620816, -1.6559002886))
            ThreePointArc((-0.9316620816, -1.6559002886), (-0.9163581335, -1.6598827965), (-0.901081026, -1.6557985362))
            ThreePointArc((-0.901081026, -1.6557985362), (-0.6225892324, -1.4393456452), (-0.4156508989, -1.1537129104))
            ThreePointArc((-0.4156508989, -1.1537129104), (-0.3997956142, -1.139414239), (-0.3784552187, -1.1387588188))
        make_face()
    extrude(amount=F1_DEPTH)

    # F2 (on face) → F3 (cut, through all)
    with BuildSketch(Plane.XZ.offset(2.2)):
        Circle(F2_R)
    extrude(amount=-F3_DEPTH, mode=Mode.SUBTRACT)


solid = f1.part
